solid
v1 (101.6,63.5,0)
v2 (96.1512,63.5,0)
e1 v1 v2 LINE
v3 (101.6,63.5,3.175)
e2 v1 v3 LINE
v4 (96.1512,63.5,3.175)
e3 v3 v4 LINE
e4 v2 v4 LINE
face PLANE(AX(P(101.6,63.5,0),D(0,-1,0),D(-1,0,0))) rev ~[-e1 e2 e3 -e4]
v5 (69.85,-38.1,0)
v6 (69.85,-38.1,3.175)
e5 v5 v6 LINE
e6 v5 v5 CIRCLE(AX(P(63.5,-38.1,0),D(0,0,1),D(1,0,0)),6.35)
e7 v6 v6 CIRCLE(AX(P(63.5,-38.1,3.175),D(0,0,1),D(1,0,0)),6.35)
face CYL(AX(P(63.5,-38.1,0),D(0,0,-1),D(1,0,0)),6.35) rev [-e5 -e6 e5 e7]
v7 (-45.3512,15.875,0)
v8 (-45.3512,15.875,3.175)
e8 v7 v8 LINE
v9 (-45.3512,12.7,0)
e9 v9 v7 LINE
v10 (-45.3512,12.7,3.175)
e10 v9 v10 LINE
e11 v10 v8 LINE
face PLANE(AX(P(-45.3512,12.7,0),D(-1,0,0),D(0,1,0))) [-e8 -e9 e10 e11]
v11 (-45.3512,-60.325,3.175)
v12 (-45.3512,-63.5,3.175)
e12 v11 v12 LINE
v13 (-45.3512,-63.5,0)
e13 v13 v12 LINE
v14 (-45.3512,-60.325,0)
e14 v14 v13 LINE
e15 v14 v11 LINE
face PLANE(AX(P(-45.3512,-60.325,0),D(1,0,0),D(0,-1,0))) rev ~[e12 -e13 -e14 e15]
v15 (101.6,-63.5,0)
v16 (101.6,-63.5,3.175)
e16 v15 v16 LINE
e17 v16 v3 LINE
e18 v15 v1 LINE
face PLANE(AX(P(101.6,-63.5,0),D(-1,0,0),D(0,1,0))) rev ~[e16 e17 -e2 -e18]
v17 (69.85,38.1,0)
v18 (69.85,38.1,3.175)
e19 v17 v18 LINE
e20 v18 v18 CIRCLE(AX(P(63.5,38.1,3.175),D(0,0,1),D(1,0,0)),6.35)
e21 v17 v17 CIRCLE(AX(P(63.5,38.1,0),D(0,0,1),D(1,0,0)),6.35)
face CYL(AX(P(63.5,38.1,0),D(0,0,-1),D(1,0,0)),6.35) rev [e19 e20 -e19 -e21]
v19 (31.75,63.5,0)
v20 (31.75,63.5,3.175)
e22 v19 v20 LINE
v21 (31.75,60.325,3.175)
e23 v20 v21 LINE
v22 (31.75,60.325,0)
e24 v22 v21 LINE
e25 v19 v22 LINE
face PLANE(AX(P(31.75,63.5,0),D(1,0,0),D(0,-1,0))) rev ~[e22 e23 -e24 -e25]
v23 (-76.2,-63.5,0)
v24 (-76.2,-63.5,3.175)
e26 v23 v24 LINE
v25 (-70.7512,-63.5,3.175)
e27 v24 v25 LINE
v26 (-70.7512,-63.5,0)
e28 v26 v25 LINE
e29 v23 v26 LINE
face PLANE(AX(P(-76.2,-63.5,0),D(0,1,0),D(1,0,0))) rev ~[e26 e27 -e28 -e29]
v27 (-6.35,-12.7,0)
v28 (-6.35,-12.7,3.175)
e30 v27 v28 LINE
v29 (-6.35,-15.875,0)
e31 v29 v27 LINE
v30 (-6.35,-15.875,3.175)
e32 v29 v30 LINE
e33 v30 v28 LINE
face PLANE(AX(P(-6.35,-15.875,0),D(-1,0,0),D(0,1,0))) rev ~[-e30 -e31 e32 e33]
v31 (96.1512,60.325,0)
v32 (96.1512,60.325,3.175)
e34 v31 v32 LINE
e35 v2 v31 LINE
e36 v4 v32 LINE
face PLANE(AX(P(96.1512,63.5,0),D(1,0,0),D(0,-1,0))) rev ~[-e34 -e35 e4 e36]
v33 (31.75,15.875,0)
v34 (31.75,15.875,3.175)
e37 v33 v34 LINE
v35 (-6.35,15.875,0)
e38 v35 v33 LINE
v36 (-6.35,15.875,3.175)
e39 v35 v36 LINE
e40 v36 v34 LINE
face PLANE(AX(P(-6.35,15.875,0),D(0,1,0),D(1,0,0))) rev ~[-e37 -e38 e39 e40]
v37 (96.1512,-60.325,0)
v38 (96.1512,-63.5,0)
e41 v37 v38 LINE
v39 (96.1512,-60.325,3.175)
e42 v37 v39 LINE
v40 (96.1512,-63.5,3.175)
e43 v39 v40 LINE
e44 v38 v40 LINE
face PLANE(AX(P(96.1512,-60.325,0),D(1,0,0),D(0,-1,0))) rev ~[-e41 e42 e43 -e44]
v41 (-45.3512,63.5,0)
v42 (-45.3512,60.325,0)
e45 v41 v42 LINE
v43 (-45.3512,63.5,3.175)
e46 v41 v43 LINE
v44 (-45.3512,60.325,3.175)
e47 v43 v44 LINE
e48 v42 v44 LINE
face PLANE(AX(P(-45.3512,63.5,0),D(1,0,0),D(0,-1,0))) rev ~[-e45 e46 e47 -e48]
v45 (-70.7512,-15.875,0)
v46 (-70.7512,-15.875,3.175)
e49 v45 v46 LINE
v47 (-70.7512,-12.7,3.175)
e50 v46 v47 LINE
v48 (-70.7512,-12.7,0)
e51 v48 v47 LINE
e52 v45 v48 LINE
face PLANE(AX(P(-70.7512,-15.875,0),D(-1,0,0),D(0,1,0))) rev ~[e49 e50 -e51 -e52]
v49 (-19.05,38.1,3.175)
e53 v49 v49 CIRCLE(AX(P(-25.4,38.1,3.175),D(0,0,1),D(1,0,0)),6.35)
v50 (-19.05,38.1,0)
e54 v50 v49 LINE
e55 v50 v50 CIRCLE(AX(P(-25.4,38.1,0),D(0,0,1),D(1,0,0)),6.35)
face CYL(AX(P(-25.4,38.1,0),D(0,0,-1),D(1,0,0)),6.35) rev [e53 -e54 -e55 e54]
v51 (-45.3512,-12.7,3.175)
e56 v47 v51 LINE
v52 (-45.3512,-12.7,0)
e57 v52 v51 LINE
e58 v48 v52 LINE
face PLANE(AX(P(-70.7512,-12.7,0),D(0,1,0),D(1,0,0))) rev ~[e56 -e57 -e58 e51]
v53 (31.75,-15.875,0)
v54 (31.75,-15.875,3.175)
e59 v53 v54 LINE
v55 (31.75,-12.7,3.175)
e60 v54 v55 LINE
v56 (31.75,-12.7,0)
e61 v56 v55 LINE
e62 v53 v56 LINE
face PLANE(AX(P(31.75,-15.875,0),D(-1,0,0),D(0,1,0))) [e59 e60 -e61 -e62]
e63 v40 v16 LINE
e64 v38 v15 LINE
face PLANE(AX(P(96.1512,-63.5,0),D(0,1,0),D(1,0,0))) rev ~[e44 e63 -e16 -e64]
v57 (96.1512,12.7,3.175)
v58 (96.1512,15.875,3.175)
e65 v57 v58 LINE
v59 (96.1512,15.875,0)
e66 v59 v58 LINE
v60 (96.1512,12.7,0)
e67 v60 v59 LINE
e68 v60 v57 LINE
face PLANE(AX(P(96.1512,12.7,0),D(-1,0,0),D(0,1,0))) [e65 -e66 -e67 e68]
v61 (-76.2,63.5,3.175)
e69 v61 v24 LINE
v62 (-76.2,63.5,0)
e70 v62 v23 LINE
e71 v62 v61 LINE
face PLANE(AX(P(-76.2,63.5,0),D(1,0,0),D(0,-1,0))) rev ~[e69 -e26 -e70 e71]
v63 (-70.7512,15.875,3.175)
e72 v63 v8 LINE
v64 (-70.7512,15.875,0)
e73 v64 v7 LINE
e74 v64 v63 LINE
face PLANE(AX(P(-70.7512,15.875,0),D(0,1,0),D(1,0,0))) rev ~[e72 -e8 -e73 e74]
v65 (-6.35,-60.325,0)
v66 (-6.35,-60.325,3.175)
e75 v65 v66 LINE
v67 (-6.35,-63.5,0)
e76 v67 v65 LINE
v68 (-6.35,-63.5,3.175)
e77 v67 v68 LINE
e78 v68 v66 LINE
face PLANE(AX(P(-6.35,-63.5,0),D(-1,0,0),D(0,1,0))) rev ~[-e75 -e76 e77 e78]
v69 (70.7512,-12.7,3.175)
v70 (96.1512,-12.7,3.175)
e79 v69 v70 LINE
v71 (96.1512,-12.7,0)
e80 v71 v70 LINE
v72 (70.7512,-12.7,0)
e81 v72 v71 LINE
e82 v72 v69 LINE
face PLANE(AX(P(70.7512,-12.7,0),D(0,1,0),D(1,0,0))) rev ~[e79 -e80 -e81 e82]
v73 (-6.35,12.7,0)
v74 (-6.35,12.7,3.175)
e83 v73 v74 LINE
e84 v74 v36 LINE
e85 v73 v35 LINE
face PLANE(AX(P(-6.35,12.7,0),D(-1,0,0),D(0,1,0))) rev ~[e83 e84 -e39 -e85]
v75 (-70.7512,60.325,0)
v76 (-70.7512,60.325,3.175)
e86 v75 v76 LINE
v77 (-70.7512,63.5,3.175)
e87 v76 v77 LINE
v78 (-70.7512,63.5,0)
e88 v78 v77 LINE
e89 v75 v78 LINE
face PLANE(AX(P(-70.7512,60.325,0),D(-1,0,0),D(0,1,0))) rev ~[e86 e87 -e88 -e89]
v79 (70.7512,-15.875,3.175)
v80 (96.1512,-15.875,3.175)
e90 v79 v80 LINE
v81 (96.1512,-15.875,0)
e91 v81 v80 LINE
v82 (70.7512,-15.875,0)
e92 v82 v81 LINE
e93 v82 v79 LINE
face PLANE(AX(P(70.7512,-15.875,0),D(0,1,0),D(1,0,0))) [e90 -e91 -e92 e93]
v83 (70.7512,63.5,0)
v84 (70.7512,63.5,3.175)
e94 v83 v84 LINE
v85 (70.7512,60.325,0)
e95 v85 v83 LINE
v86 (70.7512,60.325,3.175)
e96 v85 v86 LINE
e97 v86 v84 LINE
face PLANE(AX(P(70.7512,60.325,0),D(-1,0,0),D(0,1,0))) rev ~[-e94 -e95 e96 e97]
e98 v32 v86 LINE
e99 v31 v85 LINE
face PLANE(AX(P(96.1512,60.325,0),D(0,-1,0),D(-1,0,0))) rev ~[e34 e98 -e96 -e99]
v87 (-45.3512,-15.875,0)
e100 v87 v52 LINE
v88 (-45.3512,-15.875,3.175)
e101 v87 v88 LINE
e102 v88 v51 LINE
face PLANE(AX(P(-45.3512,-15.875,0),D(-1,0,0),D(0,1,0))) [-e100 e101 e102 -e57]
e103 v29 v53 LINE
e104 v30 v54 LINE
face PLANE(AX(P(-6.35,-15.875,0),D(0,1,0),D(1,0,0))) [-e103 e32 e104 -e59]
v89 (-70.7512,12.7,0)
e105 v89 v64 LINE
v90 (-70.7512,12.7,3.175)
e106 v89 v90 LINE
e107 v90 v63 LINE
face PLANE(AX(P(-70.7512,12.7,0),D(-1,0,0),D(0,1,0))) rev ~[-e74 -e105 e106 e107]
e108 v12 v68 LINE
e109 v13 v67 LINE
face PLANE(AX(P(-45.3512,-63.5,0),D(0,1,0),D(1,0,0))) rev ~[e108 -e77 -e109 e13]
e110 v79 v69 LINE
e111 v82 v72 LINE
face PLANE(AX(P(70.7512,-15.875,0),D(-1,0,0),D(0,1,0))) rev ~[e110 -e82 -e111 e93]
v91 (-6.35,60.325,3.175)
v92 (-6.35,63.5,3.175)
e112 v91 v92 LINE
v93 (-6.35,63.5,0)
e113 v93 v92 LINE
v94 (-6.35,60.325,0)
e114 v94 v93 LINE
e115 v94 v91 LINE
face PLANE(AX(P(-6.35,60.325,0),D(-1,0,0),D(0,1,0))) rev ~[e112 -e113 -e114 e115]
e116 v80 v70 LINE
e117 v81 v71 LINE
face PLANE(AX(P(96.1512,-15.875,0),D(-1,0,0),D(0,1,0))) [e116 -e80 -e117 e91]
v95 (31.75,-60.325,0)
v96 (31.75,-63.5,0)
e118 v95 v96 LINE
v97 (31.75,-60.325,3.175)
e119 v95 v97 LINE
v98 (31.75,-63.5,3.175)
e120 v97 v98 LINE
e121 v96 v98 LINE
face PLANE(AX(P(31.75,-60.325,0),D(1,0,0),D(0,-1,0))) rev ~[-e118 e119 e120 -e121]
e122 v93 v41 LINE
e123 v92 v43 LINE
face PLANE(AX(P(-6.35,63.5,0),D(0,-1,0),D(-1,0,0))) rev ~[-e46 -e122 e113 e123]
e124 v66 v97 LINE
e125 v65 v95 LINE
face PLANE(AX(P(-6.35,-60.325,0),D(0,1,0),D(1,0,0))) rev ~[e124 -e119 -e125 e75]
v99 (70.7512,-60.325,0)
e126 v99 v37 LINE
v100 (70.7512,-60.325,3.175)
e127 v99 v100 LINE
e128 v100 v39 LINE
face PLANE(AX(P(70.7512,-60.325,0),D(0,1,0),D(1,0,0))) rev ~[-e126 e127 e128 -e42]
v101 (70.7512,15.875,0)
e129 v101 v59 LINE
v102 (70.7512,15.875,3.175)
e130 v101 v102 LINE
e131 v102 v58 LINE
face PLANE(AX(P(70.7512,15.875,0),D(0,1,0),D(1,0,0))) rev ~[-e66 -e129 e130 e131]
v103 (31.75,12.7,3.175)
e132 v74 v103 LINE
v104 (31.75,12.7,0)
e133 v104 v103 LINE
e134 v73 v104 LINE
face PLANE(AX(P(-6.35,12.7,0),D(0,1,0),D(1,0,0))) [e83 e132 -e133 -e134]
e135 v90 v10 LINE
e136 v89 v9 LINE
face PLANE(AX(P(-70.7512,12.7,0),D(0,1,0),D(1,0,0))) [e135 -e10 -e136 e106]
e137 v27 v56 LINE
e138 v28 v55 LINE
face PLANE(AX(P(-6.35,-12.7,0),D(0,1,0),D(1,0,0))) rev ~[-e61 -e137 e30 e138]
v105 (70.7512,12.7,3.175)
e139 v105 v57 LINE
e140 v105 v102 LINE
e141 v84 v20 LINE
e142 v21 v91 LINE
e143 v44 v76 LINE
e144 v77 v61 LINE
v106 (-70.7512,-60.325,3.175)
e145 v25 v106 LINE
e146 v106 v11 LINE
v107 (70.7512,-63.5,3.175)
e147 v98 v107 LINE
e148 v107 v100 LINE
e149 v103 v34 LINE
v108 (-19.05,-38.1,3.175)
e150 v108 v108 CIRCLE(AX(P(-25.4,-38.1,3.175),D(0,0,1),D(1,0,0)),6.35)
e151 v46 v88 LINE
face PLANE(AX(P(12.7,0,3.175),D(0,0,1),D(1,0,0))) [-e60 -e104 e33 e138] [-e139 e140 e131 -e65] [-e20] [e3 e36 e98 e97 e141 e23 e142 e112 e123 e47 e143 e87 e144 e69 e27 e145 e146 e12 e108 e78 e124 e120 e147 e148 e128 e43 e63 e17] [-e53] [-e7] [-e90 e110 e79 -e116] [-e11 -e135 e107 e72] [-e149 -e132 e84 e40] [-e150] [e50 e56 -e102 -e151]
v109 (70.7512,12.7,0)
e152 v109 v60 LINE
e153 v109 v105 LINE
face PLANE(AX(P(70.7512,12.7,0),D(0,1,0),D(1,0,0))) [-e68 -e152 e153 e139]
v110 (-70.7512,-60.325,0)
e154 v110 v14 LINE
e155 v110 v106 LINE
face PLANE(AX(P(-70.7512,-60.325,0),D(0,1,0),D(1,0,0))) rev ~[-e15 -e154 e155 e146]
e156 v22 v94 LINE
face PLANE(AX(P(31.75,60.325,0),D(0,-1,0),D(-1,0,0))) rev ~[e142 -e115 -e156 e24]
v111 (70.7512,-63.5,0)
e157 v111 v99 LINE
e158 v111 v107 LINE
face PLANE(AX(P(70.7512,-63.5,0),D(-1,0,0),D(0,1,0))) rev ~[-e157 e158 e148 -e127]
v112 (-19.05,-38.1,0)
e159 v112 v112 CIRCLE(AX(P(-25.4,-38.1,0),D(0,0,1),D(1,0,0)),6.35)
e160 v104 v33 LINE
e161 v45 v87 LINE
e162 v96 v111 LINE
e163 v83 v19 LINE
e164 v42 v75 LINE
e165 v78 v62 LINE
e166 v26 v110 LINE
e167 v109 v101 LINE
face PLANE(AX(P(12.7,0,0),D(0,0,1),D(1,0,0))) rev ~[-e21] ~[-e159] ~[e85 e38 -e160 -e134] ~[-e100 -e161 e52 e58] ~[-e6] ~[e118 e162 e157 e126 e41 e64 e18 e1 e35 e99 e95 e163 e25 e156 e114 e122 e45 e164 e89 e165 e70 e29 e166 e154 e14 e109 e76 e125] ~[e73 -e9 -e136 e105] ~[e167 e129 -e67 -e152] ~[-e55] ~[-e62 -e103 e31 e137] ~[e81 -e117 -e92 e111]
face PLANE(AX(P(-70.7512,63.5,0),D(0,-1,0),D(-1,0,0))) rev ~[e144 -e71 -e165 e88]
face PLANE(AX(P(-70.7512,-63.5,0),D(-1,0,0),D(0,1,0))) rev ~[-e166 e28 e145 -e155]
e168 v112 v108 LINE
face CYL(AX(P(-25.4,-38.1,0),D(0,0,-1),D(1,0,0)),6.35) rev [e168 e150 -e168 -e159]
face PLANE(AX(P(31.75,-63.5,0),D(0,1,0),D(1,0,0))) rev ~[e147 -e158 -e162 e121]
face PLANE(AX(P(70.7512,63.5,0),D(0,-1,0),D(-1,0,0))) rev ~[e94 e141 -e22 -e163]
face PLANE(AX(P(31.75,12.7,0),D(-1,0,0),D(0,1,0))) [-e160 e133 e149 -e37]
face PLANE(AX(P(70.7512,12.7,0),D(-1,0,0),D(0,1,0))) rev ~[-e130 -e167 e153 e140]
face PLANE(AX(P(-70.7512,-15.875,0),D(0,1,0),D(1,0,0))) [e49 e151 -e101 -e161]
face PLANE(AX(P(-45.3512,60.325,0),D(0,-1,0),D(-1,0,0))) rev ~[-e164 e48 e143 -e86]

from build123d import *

# Parameters (mm, degrees)
F0_R     = 6.35
F0_W     = 25.4
F0_H     = 3.175
F0_W_2   = 38.1
F1_DEPTH = 3.175


# Not quite as in the source:
# - a feature names something its author has since deleted; it is built from what else it names


with BuildPart() as f1:
    # F0 (on Top) → F1 (new body)
    with BuildSketch(Plane.XY):
        Polygon((-70.7512, 63.5), (-76.2, 63.5), (-76.2, -63.5), (-70.7512, -63.5), (-70.7512, -60.325), (-45.3512, -60.325), (-45.3512, -63.5), (-6.35, -63.5), (-6.35, -60.325), (31.75, -60.325), (31.75, -63.5), (70.7512, -63.5), (70.7512, -60.325), (96.1512, -60.325), (96.1512, -63.5), (101.6, -63.5), (101.6, 63.5), (96.1512, 63.5), (96.1512, 60.325), (70.7512, 60.325), (70.7512, 63.5), (31.75, 63.5), (31.75, 60.325), (-6.35, 60.325), (-6.35, 63.5), (-45.3512, 63.5), (-45.3512, 60.325), (-70.7512, 60.325), align=None)
        with Locations((-25.4, -38.1)):
            Circle(F0_R, mode=Mode.SUBTRACT)
        with Locations((-58.0512, -14.2875)):
            Rectangle(F0_W, F0_H, mode=Mode.SUBTRACT)
        with Locations((63.5, -38.1)):
            Circle(F0_R, mode=Mode.SUBTRACT)
        with Locations((12.7, -14.2875)):
            Rectangle(F0_W_2, F0_H, mode=Mode.SUBTRACT)
        with Locations((83.4512, -14.2875)):
            Rectangle(F0_W, F0_H, mode=Mode.SUBTRACT)
        with Locations((-58.0512, 14.2875)):
            Rectangle(F0_W, F0_H, mode=Mode.SUBTRACT)
        with Locations((-25.4, 38.1)):
            Circle(F0_R, mode=Mode.SUBTRACT)
        with Locations((12.7, 14.2875)):
            Rectangle(F0_W_2, F0_H, mode=Mode.SUBTRACT)
        with Locations((83.4512, 14.2875)):
            Rectangle(F0_W, F0_H, mode=Mode.SUBTRACT)
        with Locations((63.5, 38.1)):
            Circle(F0_R, mode=Mode.SUBTRACT)
    extrude(amount=F1_DEPTH)


solid = f1.part
